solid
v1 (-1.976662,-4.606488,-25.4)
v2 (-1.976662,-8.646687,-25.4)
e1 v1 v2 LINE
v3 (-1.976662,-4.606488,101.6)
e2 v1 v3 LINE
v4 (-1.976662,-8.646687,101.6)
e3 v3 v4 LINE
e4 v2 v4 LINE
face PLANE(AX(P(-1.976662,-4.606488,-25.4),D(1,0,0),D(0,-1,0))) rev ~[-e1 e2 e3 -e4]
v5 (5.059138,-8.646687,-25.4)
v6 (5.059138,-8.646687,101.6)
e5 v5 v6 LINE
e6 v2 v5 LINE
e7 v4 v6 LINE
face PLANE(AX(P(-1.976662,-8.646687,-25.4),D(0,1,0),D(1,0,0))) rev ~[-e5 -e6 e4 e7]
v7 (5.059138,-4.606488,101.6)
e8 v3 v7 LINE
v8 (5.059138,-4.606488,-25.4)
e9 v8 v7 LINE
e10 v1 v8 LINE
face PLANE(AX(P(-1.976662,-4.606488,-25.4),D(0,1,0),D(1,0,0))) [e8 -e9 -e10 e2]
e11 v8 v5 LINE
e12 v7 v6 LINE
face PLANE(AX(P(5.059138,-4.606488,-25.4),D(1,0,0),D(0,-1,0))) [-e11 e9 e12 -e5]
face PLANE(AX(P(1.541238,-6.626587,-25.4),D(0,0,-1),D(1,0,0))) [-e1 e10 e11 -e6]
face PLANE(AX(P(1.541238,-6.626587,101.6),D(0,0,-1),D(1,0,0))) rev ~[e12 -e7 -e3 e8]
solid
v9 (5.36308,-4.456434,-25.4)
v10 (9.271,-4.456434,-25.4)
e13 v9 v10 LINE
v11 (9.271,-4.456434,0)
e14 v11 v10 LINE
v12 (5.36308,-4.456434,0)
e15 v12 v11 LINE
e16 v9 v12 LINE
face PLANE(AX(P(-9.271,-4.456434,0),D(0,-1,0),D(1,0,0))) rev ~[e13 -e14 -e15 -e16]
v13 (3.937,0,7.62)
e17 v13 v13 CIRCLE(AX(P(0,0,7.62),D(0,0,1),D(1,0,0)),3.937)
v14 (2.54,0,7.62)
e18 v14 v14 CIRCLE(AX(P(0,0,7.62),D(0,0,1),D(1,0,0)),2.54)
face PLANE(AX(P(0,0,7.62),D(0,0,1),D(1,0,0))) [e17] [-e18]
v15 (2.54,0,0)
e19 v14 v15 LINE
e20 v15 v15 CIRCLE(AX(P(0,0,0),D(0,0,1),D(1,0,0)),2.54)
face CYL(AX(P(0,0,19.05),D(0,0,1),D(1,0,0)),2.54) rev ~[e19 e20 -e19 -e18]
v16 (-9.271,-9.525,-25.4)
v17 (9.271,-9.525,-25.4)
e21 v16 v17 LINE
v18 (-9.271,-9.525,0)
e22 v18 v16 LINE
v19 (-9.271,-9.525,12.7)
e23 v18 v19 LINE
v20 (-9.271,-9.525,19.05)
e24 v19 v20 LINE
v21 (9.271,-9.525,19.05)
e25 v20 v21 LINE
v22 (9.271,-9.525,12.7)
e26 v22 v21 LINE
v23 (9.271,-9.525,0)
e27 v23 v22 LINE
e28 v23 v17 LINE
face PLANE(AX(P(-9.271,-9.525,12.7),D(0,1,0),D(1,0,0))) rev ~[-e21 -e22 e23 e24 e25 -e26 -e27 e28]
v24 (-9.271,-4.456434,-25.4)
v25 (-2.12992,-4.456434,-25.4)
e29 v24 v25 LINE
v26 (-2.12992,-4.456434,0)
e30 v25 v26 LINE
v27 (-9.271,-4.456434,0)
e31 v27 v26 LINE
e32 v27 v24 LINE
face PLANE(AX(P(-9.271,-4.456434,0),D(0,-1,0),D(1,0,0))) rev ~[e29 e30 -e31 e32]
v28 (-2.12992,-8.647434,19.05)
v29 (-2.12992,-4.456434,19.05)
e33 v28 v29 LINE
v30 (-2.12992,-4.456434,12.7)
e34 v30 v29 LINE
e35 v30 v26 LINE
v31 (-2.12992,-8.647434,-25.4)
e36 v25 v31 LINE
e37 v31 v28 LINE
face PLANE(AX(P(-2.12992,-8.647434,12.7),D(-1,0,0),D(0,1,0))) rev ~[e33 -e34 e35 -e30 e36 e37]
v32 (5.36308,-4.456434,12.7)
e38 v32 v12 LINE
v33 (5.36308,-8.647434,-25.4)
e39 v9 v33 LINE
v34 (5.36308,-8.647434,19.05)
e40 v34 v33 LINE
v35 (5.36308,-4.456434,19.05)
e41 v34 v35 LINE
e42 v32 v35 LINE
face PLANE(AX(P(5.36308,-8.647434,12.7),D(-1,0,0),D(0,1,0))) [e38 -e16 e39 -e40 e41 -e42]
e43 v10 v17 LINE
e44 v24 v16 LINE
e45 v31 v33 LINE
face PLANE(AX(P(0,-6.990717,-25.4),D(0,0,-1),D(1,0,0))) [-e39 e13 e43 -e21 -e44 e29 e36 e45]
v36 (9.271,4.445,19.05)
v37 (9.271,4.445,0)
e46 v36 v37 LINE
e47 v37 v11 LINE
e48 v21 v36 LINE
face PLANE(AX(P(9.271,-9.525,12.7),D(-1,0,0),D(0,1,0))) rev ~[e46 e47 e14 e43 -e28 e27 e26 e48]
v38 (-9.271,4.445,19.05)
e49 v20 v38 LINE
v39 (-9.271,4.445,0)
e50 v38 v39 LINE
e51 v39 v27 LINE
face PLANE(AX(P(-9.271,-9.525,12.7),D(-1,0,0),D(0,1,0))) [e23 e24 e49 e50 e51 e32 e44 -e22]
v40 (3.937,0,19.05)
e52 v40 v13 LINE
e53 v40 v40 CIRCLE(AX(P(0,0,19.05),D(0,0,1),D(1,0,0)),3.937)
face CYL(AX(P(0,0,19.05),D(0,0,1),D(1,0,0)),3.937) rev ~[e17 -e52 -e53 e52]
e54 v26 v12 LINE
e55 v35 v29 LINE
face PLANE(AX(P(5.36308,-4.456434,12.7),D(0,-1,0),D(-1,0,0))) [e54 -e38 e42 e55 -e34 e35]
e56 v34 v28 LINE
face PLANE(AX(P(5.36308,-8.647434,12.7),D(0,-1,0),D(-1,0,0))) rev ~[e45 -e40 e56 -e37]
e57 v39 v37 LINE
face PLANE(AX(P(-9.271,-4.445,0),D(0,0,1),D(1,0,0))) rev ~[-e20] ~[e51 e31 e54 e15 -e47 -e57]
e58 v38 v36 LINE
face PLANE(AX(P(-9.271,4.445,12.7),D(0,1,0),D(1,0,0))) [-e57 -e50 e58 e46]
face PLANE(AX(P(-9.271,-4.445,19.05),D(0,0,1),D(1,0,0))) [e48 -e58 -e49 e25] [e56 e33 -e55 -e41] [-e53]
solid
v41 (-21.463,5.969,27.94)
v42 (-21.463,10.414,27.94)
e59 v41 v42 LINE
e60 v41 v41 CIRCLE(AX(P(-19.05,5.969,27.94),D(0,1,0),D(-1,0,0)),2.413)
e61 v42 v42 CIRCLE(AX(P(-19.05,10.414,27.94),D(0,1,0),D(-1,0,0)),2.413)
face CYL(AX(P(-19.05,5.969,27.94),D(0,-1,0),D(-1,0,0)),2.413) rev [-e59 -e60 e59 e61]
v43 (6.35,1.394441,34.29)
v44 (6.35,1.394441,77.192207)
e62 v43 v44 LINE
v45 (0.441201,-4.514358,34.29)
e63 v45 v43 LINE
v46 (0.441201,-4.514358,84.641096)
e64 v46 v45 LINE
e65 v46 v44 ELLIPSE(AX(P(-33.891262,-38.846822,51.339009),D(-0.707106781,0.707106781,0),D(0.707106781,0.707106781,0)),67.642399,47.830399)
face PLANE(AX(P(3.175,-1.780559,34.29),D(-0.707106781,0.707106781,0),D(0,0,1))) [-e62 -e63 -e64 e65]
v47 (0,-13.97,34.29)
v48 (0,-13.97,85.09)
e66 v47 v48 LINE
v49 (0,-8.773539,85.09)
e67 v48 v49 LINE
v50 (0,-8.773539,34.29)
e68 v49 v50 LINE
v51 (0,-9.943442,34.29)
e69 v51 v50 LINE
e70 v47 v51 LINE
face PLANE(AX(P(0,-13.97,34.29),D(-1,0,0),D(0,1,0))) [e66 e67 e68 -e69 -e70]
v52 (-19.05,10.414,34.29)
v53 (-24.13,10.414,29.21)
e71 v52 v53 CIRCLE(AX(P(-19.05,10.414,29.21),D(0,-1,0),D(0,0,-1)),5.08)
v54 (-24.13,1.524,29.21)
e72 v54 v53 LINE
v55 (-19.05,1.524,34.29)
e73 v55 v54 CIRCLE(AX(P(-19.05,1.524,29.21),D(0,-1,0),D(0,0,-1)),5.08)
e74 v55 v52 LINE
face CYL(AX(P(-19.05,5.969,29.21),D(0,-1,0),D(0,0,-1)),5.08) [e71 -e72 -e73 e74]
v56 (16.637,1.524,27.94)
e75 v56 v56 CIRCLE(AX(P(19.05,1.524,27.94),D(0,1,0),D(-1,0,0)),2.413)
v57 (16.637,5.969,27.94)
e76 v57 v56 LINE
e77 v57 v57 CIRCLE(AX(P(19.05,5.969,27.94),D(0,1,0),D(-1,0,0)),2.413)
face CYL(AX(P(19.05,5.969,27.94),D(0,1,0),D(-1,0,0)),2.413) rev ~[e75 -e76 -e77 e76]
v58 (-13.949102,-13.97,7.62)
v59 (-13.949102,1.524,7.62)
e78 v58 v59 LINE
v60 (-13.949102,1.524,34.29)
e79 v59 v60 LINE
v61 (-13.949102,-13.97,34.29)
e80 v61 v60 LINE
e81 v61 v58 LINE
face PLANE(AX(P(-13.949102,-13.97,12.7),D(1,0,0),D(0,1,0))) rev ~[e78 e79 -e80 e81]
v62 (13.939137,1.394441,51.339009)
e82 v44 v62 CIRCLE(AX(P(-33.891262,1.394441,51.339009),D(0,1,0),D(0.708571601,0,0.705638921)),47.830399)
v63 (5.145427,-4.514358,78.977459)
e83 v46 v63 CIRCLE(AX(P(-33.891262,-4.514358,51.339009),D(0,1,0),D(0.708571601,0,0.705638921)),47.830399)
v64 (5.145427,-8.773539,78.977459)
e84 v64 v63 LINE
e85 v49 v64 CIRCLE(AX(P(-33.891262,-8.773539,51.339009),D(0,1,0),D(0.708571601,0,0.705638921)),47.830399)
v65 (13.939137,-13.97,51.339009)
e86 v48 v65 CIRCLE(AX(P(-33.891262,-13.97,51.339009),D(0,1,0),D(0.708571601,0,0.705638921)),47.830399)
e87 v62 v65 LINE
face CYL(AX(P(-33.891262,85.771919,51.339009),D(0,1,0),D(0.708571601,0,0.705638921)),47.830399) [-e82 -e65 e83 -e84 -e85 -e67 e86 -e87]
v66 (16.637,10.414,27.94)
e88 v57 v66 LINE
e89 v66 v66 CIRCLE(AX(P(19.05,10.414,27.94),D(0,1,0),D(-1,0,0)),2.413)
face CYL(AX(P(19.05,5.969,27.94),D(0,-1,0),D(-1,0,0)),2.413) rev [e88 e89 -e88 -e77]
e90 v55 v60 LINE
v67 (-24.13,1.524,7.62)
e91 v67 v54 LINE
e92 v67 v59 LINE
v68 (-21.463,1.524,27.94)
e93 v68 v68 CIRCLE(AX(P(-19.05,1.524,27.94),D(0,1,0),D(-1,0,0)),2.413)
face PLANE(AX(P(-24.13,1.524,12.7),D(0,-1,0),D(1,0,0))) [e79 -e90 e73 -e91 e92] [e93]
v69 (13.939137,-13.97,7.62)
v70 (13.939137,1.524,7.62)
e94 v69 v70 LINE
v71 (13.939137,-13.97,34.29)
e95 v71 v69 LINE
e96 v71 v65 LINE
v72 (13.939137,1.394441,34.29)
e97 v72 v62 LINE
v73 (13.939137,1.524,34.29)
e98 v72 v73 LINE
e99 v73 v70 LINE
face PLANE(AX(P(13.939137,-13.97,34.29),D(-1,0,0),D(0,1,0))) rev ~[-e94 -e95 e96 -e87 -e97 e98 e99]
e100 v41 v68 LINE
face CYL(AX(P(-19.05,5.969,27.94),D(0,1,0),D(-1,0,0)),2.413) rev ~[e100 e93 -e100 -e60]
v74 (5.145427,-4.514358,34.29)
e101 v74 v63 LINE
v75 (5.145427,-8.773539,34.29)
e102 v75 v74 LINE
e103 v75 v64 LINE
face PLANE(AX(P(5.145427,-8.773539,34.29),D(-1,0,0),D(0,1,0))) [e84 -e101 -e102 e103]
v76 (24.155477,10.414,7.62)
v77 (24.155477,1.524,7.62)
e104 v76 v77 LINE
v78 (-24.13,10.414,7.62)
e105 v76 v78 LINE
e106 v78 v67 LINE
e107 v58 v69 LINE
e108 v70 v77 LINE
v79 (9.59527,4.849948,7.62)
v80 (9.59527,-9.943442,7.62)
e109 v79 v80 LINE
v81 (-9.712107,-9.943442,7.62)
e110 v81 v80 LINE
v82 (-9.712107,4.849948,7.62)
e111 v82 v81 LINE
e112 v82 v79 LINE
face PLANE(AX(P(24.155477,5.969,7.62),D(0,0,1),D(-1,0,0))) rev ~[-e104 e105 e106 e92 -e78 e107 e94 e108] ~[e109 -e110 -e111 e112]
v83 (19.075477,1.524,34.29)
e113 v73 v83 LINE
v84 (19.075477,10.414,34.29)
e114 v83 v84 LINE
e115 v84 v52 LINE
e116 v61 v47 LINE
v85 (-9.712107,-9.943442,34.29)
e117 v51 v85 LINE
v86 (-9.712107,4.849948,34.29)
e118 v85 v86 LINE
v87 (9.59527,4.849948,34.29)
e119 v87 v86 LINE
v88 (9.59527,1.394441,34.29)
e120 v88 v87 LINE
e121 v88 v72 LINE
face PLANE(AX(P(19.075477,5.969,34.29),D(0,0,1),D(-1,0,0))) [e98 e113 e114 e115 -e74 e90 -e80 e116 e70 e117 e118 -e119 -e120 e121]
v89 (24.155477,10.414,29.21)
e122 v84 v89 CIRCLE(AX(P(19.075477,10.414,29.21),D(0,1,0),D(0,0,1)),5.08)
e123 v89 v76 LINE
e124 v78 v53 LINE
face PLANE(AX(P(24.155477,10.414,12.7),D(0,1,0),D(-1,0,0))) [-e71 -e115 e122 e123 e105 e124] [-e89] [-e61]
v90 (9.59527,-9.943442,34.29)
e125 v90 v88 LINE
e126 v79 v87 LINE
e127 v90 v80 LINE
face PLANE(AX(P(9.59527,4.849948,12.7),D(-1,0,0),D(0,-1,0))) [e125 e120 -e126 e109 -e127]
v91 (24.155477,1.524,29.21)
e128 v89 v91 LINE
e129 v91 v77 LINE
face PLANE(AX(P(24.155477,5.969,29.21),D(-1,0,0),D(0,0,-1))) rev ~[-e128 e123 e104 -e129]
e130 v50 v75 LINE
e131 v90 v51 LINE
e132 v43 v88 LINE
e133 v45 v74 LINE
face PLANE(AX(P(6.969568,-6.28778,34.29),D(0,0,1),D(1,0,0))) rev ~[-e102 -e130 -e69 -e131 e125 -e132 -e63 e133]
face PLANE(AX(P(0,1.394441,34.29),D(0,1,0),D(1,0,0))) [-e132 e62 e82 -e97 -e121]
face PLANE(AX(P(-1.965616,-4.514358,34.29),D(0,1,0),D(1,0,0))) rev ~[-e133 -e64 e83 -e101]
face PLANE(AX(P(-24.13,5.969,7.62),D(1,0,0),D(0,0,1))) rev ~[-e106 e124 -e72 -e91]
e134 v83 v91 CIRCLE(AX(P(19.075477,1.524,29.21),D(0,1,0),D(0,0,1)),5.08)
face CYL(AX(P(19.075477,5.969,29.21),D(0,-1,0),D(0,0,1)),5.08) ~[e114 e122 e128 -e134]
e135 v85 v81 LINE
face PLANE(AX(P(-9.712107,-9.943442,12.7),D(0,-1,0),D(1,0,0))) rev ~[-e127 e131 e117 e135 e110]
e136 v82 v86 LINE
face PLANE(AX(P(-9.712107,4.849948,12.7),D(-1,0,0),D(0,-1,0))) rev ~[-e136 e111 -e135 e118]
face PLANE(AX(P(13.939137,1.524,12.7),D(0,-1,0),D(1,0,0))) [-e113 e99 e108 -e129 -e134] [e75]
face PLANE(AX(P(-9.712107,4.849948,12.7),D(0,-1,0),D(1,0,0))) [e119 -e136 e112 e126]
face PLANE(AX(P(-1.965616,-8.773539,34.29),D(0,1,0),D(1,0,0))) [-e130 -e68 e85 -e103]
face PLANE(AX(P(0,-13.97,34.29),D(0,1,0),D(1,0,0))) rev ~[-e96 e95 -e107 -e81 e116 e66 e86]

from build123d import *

# Parameters (mm, degrees)
F0_W         = 18.542
F0_H         = 8.89
F1_DEPTH     = 6.35
F2_DEPTH     = 5.08
F3_W         = 18.542
F3_H         = 5.0685656011
F4_DEPTH     = 25.4
F5_W         = 7.493
F5_H         = 4.191
F6_DEPTH     = 125.222
F7_DEPTH     = 6.35
F8_W         = 7.0358
F8_H         = 4.0401988663
F9_DEPTH     = 127
F11_DEPTH    = 21.59
F12_R        = 2.413
F13_DEPTH    = 25.4
F14_W        = 19.3073768169
F14_H        = 14.7933904082
F15_DEPTH    = 41.656
F16_W        = 10.1808982092
F16_H        = 21.59
F16_W_2      = 10.2163404226
F17_DEPTH    = 15.494
F18_DEPTH    = 5.08
F19_DEPTH    = 6.35
F20_W        = 13.9391366392
F20_H        = 15.3644406528
F21_DEPTH    = 50.8
F22_T1_DEPTH = 184.1193966406
F23_SIZE     = 6.35
F24_R        = 5.08
F25_W        = 7.1110432036
F25_H        = 4.2591807432
F26_DEPTH    = 73.152
F27_DEPTH    = 4.445
F28_R        = 2.54
F30_DEPTH    = 25.4
F29_R        = 3.937
F31_DEPTH    = 11.43


# Not quite as in the source:
# - a fillet or chamfer that OpenCascade refuses, or shapes differently, is made with other operations: its cross-section is extruded or revolved along the edge and cut away or added


with BuildPart() as f1:
    # F0 (on Top) → F1 (new body)
    with BuildSketch(Plane.XY):
        Rectangle(F0_W, F0_H)
    extrude(amount=F1_DEPTH)

    # F2 (add): a face of the model
    f2_faces = [f1.faces().sort_by_distance(p)[0] for p in [
        (0, -4.445, 3.175),
    ]]
    extrude(f2_faces, amount=F2_DEPTH)

    # F3 (on face) → F4 (join)
    with BuildSketch(Plane(origin=(0, 0, 0), x_dir=(1, 0, 0), z_dir=(0, 0, -1))):
        with Locations((0, 6.9907171994)):
            Rectangle(F3_W, F3_H)
    extrude(amount=F4_DEPTH)

    # F5 (on face) → F6 (cut)
    with BuildSketch(Plane(origin=(0, 0, -25.4), x_dir=(1, 0, 0), z_dir=(0, 0, -1))):
        with Locations((1.6165795822, 6.5519343989)):
            Rectangle(F5_W, F5_H)
    extrude(amount=-F6_DEPTH, mode=Mode.SUBTRACT)

    # F7 (add): a face of the model
    f7_faces = [f1.faces().sort_by_distance(p)[0] for p in [
        (-0.2230199424, -1.9865219107, 6.35),
    ]]
    extrude(f7_faces, amount=F7_DEPTH)

    # F19 (add): a face of the model
    f19_faces = [f1.faces().sort_by_distance(p)[0] for p in [
        (-0.2230199424, -1.9865219107, 12.7),
    ]]
    extrude(f19_faces, amount=F19_DEPTH)

    # F28 (on face) → F30 (cut)
    with BuildSketch(Plane.XY.offset(19.05)):
        Circle(F28_R)
    extrude(amount=-F30_DEPTH, mode=Mode.SUBTRACT)

    # F29 (on face) → F31 (cut)
    with BuildSketch(Plane.XY.offset(19.05)):
        Circle(F29_R)
    extrude(amount=-F31_DEPTH, mode=Mode.SUBTRACT)


with BuildPart() as f9:
    # F8 (on face) → F9 (new body)
    with BuildSketch(Plane(origin=(0, 0, -25.4), x_dir=(1, 0, 0), z_dir=(0, 0, -1))):
        with Locations((1.5412379404, 6.6265871283)):
            Rectangle(F8_W, F8_H)
    extrude(amount=-F9_DEPTH)


with BuildPart() as f11:
    # F10 (on face) → F11 (new body)
    with BuildSketch(Plane.XY.offset(12.7)):
        Polygon((-24.13, 5.969), (-24.13, 0), (-24.13, -13.97), (24.1554770619, -13.97), (24.1554770619, 5.969), align=None)
    extrude(amount=F11_DEPTH)

    # F12 (on face) → F13 (cut)
    with BuildSketch(Plane(origin=(0, 5.969, 0), x_dir=(-1, 0, 0), z_dir=(0, 1, 0))):
        with Locations((19.05, 27.94)):
            Circle(F12_R)
        with Locations((-19.05, 27.94)):
            Circle(F12_R)
    extrude(amount=-F13_DEPTH, mode=Mode.SUBTRACT)

    # F14 (on face) → F15 (cut)
    with BuildSketch(Plane(origin=(0, 0, 12.7), x_dir=(1, 0, 0), z_dir=(0, 0, -1))):
        with Locations((-0.0584181398, 2.5467472151)):
            Rectangle(F14_W, F14_H)
    extrude(amount=-F15_DEPTH, mode=Mode.SUBTRACT)

    # F16 (on face) → F17 (cut)
    with BuildSketch(Plane.XZ.offset(13.97)):
        with Locations((-19.0395508954, 23.495)):
            Rectangle(F16_W, F16_H)
        with Locations((19.0473068506, 23.495)):
            Rectangle(F16_W_2, F16_H)
    extrude(amount=-F17_DEPTH, mode=Mode.SUBTRACT)

    # F18 (add): a face of the model
    f18_faces = [f11.faces().sort_by_distance(p)[0] for p in [
        (19.0473068506, 2.0464031983, 12.7),
    ]]
    extrude(f18_faces, amount=F18_DEPTH)

    # F20 (on face) → F21 (join)
    with BuildSketch(Plane.XY.offset(34.29)):
        with Locations((6.9695683196, -6.2877796736)):
            Rectangle(F20_W, F20_H)
    extrude(amount=F21_DEPTH)

    # F22: fillet of radius 47.8303990977 on 1 edges, made by hand

    # F22_s2 → F22_t1 (cut)
    with BuildSketch(Plane.XZ.offset(-85.7719186467)):
        with BuildLine():
            ThreePointArc((0, 85.09), (10.3172191212, 69.5970819282), (13.9391366392, 51.3390088024))
            Line((13.9391366392, 51.3390088024), (13.9391366392, 85.09))
            Line((13.9391366392, 85.09), (0, 85.09))
        make_face()
    extrude(amount=F22_T1_DEPTH, mode=Mode.SUBTRACT)

    # F23
    f23_edges = [f11.edges().sort_by_distance(p)[0] for p in [
        (0, 1.394441, 59.69),
    ]]
    chamfer(f23_edges, length=F23_SIZE)

    # F24
    f24_edges = [f11.edges().sort_by_distance(p)[0] for p in [
        (-24.13, 3.7465, 34.29),
        (24.155477, 3.7465, 34.29),
    ]]
    fillet(f24_edges, radius=F24_R)

    # F25 (on face) → F26 (cut)
    with BuildSketch(Plane.XY.offset(34.29)):
        with Locations((1.5899057034, -6.6439488437)):
            Rectangle(F25_W, F25_H)
    extrude(amount=F26_DEPTH, mode=Mode.SUBTRACT)

    # F27 (add): a face of the model
    f27_faces = [f11.faces().sort_by_distance(p)[0] for p in [
        (0.0131143273, 5.969, 20.6399690169),
    ]]
    extrude(f27_faces, amount=F27_DEPTH)


solid = Compound([f1.part, f9.part, f11.part])
